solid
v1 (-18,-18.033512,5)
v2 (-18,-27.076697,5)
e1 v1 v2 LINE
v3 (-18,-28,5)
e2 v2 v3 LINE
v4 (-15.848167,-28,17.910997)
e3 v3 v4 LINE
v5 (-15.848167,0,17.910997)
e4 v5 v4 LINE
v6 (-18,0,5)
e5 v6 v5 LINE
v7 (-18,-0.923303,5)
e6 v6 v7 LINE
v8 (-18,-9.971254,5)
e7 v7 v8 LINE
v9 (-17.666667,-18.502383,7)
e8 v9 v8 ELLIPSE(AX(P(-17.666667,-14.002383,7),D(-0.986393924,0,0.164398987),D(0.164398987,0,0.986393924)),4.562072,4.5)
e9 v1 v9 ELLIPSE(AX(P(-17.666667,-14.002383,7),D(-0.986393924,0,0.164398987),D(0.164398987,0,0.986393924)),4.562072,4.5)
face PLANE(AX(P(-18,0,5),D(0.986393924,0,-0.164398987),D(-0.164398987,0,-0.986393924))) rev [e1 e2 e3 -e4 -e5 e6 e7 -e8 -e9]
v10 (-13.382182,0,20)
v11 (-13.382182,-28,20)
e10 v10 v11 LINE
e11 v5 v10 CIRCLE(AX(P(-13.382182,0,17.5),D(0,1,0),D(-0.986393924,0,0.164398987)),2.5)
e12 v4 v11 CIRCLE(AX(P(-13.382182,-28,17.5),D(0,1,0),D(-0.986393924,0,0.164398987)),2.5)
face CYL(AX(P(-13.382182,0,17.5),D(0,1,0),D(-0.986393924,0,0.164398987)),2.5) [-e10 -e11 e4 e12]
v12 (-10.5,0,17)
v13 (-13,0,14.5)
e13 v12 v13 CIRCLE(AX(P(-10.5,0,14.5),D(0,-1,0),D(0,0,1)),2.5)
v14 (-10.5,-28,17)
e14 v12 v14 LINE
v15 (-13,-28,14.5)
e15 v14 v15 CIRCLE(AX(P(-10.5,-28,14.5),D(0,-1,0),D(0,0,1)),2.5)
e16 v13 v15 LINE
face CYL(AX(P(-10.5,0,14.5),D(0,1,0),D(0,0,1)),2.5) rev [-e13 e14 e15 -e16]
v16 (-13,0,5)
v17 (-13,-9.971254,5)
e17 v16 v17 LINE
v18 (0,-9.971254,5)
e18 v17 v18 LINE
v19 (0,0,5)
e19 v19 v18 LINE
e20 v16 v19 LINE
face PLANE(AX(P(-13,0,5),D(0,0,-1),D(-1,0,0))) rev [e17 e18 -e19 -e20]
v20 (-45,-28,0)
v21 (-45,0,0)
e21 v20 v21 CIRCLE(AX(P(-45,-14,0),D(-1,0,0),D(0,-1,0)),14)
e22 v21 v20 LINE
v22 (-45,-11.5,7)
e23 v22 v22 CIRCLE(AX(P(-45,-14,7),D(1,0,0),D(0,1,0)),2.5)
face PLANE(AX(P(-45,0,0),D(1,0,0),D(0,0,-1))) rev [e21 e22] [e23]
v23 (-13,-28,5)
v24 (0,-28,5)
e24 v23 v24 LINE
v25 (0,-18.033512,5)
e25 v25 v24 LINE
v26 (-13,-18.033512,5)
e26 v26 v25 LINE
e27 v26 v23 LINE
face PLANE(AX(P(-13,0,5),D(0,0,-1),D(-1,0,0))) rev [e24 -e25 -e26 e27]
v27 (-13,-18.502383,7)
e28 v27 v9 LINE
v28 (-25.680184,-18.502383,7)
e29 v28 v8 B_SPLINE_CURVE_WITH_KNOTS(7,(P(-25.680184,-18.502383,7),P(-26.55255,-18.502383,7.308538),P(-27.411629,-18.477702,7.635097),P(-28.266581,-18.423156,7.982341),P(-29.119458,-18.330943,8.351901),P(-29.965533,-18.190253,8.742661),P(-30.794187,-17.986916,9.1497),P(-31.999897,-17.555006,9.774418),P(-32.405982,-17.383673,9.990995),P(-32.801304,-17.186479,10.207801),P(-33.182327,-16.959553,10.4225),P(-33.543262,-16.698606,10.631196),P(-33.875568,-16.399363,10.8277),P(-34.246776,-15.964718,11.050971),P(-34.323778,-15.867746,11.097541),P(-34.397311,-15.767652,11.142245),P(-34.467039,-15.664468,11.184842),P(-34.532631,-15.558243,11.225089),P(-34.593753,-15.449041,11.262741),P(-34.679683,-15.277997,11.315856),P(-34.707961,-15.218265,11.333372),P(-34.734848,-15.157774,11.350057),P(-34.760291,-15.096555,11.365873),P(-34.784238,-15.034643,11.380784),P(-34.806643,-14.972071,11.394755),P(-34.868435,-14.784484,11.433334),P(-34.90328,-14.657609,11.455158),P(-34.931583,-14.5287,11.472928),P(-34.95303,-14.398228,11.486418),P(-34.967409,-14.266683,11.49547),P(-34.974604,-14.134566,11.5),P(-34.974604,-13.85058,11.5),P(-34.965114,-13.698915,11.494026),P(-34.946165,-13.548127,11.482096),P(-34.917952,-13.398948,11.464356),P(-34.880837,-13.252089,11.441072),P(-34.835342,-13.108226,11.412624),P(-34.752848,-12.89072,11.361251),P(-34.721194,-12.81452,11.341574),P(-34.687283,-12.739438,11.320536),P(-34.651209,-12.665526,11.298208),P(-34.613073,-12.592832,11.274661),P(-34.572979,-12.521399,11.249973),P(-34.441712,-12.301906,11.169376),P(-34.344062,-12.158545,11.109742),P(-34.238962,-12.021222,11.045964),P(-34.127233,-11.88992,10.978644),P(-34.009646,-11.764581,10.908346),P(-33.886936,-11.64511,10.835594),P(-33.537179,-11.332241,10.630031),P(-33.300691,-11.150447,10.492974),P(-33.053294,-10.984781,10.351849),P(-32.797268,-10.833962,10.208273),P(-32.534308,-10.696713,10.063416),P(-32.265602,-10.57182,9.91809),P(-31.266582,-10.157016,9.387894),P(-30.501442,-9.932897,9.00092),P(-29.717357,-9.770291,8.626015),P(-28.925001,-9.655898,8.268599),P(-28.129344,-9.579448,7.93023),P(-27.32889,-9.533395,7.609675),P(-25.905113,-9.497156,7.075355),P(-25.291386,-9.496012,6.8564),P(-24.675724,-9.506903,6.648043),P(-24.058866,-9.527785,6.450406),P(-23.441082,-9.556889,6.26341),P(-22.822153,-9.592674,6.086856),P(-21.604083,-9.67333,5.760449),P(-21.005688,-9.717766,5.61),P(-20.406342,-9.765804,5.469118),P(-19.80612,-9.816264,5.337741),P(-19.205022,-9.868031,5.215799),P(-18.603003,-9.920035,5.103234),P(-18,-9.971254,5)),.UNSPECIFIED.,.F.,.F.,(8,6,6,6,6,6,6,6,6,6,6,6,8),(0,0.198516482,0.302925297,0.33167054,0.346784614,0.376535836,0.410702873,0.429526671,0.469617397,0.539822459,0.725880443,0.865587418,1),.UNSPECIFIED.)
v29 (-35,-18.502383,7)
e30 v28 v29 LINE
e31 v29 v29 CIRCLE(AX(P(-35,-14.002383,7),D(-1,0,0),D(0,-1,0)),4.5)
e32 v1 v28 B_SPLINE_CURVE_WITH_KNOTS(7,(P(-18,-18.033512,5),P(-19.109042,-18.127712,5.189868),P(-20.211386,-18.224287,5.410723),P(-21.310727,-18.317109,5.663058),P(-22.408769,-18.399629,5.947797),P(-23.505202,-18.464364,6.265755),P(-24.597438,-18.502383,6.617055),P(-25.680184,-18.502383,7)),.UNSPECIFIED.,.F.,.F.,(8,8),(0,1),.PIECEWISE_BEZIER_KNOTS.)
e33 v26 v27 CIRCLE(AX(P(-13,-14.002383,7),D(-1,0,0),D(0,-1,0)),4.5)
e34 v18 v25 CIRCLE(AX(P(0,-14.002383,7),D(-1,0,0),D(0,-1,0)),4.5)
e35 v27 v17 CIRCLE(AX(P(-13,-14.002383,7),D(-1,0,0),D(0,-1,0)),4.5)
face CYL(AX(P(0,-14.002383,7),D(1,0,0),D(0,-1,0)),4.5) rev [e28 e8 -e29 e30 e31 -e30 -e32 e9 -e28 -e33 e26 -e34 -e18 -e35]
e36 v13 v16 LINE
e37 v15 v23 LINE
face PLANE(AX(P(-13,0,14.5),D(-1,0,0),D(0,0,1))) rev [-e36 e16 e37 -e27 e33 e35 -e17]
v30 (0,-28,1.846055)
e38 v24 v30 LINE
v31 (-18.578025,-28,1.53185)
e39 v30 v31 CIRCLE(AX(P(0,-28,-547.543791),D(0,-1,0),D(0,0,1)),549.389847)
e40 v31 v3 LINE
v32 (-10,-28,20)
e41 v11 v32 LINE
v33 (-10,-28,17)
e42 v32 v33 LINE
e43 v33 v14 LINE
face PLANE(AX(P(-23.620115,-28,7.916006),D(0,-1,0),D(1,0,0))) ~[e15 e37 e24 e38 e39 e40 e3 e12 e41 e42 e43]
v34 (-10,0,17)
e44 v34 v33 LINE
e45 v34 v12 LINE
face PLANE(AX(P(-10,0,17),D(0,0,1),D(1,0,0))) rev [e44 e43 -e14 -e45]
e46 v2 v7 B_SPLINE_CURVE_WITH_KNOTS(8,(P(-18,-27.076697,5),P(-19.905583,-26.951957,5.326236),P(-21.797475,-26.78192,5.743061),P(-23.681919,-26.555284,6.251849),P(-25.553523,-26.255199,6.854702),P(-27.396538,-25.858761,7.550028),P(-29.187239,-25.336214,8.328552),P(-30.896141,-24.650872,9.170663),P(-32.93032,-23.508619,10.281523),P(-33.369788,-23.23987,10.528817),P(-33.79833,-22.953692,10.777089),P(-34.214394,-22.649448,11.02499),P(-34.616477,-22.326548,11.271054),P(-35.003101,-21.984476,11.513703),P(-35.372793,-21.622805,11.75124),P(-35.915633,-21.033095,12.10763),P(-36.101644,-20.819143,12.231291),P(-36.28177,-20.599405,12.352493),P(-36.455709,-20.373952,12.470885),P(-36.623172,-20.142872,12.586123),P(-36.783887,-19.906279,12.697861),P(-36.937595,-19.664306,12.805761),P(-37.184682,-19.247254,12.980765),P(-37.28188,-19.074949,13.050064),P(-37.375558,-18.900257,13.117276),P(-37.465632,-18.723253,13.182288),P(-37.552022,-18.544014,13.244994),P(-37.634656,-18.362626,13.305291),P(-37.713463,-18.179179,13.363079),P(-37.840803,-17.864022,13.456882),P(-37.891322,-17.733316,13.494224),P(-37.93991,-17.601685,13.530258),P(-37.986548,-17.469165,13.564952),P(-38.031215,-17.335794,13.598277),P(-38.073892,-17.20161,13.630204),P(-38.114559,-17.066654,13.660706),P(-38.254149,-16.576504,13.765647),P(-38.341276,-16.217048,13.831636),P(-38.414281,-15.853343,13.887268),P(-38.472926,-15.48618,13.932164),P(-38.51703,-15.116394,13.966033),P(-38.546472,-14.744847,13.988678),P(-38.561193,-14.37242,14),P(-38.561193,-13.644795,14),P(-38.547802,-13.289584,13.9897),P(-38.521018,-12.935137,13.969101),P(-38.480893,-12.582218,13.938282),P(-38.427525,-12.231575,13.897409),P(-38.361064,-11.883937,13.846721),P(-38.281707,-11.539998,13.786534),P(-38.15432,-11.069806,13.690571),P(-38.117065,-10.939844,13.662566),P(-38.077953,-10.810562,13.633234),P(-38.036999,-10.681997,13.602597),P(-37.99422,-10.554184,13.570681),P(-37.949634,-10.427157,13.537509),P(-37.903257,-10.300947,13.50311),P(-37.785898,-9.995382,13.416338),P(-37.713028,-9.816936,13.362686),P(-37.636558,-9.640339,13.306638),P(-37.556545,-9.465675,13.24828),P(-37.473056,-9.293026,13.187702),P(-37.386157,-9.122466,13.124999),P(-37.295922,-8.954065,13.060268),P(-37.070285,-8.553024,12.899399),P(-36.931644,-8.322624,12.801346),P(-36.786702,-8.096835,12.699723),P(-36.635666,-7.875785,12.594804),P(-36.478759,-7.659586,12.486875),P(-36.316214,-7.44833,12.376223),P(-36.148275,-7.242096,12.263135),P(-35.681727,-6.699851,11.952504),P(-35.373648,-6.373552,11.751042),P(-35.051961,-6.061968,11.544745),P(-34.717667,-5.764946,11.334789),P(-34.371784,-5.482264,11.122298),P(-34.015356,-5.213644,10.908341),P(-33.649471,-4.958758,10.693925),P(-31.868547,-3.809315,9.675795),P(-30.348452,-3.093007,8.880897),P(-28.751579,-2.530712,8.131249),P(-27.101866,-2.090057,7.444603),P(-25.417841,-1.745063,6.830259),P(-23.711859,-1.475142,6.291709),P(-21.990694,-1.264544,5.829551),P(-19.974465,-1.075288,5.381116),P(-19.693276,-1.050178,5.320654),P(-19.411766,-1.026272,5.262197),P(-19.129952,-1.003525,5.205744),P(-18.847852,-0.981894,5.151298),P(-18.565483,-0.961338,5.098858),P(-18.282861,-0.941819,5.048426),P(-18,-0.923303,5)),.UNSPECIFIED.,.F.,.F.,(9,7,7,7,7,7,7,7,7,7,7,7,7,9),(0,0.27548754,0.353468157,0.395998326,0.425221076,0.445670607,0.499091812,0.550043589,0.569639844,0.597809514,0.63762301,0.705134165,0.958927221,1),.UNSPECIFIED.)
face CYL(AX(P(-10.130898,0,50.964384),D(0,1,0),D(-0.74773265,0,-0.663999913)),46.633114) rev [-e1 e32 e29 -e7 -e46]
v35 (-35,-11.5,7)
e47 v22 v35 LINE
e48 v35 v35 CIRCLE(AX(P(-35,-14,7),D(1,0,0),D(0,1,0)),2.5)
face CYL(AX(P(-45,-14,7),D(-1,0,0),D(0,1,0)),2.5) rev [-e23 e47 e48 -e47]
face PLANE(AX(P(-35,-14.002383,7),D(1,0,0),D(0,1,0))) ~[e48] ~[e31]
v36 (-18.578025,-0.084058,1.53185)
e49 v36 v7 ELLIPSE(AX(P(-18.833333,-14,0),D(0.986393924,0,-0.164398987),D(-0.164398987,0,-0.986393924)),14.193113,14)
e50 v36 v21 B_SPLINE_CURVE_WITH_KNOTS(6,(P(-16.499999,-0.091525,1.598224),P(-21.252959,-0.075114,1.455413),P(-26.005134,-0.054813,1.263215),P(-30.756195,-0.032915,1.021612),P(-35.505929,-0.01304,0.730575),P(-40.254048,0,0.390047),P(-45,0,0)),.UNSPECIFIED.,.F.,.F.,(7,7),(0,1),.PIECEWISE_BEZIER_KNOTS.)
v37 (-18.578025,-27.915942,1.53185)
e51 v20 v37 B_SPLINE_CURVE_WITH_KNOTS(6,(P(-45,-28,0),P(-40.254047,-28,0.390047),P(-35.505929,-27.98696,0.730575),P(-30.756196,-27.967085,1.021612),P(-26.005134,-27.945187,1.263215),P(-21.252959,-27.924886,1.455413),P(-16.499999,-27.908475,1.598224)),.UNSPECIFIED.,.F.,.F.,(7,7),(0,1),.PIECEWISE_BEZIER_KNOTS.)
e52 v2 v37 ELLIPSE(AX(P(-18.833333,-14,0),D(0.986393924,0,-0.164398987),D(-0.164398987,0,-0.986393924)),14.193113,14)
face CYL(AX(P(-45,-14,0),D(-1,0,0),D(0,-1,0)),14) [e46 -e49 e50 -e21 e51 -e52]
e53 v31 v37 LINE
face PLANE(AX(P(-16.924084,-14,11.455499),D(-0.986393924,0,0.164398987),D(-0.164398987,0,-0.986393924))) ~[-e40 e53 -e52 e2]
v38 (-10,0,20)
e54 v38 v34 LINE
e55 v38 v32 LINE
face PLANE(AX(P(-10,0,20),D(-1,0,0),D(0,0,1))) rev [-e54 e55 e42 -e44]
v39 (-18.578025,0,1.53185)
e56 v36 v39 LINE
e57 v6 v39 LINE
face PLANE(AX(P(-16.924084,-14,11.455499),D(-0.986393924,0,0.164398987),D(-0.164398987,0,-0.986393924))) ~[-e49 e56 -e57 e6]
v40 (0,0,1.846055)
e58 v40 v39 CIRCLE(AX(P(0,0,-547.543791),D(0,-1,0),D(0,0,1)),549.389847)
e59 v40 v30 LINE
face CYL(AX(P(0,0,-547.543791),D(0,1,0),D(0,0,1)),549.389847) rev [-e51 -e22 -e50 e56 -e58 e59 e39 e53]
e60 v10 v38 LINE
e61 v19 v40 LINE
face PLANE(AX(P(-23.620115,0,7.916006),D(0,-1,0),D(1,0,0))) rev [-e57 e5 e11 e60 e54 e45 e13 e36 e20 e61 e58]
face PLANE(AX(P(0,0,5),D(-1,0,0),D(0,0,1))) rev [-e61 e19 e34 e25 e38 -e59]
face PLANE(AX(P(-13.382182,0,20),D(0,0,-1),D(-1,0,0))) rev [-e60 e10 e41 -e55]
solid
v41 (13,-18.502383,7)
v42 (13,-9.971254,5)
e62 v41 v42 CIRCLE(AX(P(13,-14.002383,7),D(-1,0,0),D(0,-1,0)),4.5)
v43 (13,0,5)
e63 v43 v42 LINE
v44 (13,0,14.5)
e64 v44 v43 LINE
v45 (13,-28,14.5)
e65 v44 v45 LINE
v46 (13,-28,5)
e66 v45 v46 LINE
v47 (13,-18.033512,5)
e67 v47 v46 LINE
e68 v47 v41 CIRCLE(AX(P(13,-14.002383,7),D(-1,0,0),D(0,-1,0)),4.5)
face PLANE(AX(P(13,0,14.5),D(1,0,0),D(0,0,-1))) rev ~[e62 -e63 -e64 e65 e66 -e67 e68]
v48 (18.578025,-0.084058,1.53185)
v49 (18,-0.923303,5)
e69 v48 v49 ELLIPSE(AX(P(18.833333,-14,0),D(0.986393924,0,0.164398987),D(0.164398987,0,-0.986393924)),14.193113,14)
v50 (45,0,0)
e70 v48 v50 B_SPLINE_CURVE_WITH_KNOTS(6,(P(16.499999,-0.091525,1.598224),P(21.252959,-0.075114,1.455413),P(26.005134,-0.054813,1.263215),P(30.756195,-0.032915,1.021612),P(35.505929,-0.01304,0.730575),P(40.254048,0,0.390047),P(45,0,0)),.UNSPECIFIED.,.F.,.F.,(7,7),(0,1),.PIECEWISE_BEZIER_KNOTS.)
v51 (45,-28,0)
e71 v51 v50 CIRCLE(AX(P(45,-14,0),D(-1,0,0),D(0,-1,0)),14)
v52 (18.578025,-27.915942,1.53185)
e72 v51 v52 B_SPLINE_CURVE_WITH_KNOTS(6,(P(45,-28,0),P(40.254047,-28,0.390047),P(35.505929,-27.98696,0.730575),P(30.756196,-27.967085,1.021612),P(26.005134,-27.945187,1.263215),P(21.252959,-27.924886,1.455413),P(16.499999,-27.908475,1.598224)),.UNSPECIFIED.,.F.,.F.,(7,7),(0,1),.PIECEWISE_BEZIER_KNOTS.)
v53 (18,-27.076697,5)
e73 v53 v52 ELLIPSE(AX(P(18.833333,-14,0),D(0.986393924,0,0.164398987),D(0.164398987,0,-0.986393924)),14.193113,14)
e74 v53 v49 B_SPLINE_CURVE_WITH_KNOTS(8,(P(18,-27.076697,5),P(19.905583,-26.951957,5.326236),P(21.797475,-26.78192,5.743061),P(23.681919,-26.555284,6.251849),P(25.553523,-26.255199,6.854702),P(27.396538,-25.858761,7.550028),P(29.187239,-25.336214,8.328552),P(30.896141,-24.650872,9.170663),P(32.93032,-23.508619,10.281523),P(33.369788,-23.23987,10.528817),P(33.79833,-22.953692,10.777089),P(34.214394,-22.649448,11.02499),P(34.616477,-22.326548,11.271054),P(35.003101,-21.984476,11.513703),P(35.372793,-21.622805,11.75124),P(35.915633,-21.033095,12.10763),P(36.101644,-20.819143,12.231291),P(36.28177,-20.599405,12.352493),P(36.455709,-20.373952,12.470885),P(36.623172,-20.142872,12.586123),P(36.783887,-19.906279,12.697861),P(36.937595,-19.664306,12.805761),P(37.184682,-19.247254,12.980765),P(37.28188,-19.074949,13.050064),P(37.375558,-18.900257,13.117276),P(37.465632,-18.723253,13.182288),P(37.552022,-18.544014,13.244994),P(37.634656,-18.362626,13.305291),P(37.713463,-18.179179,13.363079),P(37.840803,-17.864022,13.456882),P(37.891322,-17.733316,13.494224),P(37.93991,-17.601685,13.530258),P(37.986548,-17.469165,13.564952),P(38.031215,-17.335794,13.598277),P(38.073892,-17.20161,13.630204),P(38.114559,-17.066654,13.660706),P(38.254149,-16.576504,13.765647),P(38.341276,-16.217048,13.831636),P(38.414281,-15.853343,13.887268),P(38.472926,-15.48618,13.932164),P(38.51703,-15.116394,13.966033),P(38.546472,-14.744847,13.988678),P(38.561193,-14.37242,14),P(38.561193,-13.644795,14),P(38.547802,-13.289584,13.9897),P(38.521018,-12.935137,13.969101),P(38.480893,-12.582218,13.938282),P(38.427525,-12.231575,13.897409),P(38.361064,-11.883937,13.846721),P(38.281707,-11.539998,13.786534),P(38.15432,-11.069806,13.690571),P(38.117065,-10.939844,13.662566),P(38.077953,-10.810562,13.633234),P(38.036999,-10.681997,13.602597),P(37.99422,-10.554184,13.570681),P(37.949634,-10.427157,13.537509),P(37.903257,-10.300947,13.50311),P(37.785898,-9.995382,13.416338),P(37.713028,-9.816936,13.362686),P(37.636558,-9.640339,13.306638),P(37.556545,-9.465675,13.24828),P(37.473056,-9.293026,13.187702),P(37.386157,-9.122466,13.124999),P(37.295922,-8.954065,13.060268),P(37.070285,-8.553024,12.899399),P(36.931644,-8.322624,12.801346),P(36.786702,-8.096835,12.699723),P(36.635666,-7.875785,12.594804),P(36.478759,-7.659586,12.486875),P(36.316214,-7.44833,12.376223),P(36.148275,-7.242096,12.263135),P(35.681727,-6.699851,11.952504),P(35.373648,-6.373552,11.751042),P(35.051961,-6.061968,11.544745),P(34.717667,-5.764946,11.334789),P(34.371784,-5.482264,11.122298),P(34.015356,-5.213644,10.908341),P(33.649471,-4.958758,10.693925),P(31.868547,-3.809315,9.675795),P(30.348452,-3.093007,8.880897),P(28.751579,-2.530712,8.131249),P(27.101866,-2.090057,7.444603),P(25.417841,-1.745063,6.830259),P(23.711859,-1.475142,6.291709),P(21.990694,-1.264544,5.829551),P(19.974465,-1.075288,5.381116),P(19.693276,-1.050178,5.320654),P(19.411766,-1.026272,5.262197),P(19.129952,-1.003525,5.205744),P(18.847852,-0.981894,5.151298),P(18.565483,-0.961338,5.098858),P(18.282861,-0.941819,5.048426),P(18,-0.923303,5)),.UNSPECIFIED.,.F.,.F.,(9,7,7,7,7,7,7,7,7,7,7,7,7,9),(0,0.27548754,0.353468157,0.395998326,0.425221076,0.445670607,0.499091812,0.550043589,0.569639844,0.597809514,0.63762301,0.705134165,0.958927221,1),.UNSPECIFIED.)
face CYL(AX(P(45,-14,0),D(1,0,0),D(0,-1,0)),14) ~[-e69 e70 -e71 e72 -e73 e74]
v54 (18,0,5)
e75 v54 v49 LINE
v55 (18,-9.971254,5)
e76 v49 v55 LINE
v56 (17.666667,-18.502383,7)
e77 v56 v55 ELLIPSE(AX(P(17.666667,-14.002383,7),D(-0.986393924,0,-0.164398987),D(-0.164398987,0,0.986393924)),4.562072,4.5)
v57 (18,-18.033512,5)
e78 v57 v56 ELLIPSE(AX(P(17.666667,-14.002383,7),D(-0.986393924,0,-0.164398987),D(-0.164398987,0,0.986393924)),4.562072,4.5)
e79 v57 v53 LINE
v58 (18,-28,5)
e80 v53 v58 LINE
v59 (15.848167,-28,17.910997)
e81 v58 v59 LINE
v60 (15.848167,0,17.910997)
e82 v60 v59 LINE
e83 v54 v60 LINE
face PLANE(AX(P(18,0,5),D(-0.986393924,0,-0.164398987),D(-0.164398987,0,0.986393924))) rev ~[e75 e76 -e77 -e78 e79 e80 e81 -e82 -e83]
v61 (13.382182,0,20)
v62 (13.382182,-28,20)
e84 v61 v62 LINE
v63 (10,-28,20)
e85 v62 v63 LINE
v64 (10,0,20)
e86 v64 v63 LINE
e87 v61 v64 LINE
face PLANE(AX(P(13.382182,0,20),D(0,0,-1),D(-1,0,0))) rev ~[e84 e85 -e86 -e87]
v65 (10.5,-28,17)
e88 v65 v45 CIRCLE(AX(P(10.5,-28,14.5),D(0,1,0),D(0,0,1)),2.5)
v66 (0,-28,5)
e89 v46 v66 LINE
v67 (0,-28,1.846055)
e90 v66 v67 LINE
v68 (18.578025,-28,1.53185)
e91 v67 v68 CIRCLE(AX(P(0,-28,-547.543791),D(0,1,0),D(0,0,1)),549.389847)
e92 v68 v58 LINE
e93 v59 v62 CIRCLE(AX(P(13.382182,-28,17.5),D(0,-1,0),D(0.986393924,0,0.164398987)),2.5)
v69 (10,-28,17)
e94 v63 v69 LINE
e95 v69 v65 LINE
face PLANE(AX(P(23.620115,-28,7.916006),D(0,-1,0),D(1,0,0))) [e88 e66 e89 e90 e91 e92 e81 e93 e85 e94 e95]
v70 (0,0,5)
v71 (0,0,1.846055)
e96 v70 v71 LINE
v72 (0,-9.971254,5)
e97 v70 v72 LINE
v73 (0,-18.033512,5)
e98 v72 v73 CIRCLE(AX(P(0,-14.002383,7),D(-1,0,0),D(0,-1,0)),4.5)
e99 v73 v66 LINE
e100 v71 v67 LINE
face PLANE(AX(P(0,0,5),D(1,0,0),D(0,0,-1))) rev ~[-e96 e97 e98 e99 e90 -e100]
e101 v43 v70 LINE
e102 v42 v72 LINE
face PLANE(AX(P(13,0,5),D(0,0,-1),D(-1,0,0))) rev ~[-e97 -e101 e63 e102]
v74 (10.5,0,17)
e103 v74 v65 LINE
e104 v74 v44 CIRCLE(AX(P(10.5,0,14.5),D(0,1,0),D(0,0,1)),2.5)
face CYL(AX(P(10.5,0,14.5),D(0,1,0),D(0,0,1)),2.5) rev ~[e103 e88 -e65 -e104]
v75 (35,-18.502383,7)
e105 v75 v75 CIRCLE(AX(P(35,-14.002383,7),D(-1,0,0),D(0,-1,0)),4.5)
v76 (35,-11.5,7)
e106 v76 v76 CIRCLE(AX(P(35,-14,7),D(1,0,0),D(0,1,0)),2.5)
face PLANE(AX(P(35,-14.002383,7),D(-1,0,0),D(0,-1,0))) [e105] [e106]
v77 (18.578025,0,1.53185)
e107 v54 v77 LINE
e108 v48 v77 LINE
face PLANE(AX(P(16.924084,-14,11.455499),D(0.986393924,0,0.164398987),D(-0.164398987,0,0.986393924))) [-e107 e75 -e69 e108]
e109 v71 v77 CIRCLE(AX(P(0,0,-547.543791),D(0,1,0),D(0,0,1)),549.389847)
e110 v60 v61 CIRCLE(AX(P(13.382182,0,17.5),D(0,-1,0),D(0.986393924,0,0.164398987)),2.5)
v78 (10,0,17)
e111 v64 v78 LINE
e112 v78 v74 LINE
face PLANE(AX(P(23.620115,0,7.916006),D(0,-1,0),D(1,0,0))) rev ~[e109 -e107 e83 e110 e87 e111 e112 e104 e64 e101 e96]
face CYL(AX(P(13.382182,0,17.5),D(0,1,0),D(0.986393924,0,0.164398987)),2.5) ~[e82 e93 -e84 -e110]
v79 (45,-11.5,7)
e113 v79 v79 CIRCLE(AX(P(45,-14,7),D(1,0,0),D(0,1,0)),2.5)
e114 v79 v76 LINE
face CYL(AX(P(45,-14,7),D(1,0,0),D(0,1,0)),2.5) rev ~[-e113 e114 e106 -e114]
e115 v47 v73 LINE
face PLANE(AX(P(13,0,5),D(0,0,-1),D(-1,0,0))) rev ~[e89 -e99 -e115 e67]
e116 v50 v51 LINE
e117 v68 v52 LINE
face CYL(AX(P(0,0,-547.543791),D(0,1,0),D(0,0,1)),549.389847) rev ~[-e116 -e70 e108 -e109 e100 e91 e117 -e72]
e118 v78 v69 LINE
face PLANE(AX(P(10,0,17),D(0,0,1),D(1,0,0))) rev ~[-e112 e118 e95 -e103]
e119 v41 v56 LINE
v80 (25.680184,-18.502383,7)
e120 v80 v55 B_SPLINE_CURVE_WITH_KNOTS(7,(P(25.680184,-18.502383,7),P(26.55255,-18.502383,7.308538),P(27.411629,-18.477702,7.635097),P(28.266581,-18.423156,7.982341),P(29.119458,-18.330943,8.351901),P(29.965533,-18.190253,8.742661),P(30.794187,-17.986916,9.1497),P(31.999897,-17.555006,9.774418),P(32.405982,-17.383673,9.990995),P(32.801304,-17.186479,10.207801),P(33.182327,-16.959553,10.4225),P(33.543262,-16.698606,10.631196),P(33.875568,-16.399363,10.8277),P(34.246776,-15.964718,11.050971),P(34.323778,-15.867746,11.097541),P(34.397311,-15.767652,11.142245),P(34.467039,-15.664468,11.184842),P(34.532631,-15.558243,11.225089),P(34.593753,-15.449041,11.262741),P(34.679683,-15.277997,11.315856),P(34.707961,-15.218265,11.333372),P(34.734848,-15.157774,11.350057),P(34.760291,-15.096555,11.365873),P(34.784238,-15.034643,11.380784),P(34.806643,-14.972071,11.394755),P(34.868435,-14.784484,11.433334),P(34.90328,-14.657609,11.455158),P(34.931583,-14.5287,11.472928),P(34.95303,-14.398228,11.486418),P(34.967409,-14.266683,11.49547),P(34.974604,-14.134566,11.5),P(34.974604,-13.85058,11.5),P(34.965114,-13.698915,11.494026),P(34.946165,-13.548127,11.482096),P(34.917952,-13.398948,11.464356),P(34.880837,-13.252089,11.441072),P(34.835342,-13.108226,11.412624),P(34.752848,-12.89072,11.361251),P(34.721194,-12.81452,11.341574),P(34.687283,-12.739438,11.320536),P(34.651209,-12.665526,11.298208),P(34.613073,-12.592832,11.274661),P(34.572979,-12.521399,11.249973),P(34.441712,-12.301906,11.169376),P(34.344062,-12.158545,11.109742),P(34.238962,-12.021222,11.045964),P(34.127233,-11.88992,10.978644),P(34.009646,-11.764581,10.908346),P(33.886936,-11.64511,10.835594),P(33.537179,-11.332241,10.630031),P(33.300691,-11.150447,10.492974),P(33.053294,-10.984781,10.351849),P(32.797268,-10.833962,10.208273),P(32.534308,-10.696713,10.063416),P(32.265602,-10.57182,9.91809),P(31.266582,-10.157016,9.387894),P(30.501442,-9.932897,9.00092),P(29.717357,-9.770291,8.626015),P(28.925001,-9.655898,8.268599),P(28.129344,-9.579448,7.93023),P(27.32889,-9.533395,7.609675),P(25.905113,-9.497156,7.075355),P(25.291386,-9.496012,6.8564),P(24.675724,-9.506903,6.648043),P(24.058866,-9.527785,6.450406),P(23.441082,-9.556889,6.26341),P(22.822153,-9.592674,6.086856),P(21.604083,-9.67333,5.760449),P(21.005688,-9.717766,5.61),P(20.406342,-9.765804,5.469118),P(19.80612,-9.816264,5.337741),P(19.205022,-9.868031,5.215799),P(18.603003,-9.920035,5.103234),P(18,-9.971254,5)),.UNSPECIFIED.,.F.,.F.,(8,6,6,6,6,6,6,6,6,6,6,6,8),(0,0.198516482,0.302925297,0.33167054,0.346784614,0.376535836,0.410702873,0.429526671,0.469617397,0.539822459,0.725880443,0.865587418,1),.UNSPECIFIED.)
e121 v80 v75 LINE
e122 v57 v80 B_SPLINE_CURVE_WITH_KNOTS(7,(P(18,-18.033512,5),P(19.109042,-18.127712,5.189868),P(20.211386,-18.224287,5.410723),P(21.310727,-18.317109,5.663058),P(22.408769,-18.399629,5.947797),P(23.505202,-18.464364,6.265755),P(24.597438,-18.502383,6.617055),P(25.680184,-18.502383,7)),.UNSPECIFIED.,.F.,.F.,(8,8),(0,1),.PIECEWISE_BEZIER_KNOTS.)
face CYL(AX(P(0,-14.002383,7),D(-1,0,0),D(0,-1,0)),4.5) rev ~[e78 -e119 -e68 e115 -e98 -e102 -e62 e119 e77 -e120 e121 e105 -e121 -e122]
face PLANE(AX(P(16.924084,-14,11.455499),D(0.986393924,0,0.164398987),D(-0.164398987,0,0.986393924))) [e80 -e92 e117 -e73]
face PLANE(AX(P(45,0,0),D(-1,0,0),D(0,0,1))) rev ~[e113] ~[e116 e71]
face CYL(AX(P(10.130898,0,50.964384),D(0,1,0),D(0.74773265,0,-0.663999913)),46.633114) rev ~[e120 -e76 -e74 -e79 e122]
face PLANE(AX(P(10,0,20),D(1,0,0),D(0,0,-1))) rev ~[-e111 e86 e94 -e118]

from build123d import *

# Parameters (mm, degrees)
F1_DEPTH = 28
F2_R     = 2.5
F3_REACH = 79.4103010682
F4_R     = 4.5
F5_DEPTH = 35


with BuildPart() as f1:
    # F0 (on Front) → F1 (new body)
    with BuildSketch(Plane.XZ):
        with BuildLine():
            ThreePointArc((0, 1.8460551577), (22.518924928, 1.3843473584), (45, 0))
            Line((45, 0), (45, 20))
            ThreePointArc((45, 20), (32.777940188, 10.1997076616), (18, 5))
            Line((18, 5), (15.8481670886, 17.9109974683))
            ThreePointArc((15.8481670886, 17.9109974683), (14.9981195194, 19.4075499562), (13.382182279, 20))
            Line((13.382182279, 20), (10, 20))
            Line((10, 20), (10, 17))
            Line((10, 17), (10.5, 17))
            ThreePointArc((10.5, 17), (12.267766953, 16.267766953), (13, 14.5))
            Line((13, 14.5), (13, 5))
            Line((13, 5), (0, 5))
            Line((0, 5), (0, 1.8460551577))
        make_face()
    extrude(amount=F1_DEPTH)

    f3_end = Plane(origin=(16.9240835443, -14, 11.4554987341), x_dir=(-0.1643989873, 0, 0.9863939238), z_dir=(0.9863939238, 0, 0.1643989873))
    # F2 (on face) → F3 (cut, up to a plane its end follows)
    with BuildSketch(Plane.YZ.offset(45)):
        with BuildLine():
            ThreePointArc((-28, 0), (-14, 14), (0, 0))
            Line((0, 0), (0, 20))
            Line((0, 20), (-28, 20))
            Line((-28, 20), (-28, 0))
        make_face()
        with Locations((-14, 7)):
            Circle(F2_R)
    f3_long = extrude(amount=-F3_REACH, mode=Mode.PRIVATE)
    add(split(f3_long, bisect_by=f3_end, keep=Keep.TOP, mode=Mode.PRIVATE), mode=Mode.SUBTRACT)

    # F4 (on face) → F5 (cut)
    with BuildSketch(Plane(origin=(0, 0, 0), x_dir=(0, -1, 0), z_dir=(-1, 0, 0))):
        with Locations((14.0023827553, 7)):
            Circle(F4_R)
    extrude(amount=-F5_DEPTH, mode=Mode.SUBTRACT)


with BuildPart() as f6_1:
    # F6: instance of F1
    add(f1.part.mirror(Plane(origin=(0, -13.9995349906, 3.3159781589), x_dir=(0, -1, 0), z_dir=(-1, 0, 0))))


solid = Compound([f1.part, f6_1.part])
